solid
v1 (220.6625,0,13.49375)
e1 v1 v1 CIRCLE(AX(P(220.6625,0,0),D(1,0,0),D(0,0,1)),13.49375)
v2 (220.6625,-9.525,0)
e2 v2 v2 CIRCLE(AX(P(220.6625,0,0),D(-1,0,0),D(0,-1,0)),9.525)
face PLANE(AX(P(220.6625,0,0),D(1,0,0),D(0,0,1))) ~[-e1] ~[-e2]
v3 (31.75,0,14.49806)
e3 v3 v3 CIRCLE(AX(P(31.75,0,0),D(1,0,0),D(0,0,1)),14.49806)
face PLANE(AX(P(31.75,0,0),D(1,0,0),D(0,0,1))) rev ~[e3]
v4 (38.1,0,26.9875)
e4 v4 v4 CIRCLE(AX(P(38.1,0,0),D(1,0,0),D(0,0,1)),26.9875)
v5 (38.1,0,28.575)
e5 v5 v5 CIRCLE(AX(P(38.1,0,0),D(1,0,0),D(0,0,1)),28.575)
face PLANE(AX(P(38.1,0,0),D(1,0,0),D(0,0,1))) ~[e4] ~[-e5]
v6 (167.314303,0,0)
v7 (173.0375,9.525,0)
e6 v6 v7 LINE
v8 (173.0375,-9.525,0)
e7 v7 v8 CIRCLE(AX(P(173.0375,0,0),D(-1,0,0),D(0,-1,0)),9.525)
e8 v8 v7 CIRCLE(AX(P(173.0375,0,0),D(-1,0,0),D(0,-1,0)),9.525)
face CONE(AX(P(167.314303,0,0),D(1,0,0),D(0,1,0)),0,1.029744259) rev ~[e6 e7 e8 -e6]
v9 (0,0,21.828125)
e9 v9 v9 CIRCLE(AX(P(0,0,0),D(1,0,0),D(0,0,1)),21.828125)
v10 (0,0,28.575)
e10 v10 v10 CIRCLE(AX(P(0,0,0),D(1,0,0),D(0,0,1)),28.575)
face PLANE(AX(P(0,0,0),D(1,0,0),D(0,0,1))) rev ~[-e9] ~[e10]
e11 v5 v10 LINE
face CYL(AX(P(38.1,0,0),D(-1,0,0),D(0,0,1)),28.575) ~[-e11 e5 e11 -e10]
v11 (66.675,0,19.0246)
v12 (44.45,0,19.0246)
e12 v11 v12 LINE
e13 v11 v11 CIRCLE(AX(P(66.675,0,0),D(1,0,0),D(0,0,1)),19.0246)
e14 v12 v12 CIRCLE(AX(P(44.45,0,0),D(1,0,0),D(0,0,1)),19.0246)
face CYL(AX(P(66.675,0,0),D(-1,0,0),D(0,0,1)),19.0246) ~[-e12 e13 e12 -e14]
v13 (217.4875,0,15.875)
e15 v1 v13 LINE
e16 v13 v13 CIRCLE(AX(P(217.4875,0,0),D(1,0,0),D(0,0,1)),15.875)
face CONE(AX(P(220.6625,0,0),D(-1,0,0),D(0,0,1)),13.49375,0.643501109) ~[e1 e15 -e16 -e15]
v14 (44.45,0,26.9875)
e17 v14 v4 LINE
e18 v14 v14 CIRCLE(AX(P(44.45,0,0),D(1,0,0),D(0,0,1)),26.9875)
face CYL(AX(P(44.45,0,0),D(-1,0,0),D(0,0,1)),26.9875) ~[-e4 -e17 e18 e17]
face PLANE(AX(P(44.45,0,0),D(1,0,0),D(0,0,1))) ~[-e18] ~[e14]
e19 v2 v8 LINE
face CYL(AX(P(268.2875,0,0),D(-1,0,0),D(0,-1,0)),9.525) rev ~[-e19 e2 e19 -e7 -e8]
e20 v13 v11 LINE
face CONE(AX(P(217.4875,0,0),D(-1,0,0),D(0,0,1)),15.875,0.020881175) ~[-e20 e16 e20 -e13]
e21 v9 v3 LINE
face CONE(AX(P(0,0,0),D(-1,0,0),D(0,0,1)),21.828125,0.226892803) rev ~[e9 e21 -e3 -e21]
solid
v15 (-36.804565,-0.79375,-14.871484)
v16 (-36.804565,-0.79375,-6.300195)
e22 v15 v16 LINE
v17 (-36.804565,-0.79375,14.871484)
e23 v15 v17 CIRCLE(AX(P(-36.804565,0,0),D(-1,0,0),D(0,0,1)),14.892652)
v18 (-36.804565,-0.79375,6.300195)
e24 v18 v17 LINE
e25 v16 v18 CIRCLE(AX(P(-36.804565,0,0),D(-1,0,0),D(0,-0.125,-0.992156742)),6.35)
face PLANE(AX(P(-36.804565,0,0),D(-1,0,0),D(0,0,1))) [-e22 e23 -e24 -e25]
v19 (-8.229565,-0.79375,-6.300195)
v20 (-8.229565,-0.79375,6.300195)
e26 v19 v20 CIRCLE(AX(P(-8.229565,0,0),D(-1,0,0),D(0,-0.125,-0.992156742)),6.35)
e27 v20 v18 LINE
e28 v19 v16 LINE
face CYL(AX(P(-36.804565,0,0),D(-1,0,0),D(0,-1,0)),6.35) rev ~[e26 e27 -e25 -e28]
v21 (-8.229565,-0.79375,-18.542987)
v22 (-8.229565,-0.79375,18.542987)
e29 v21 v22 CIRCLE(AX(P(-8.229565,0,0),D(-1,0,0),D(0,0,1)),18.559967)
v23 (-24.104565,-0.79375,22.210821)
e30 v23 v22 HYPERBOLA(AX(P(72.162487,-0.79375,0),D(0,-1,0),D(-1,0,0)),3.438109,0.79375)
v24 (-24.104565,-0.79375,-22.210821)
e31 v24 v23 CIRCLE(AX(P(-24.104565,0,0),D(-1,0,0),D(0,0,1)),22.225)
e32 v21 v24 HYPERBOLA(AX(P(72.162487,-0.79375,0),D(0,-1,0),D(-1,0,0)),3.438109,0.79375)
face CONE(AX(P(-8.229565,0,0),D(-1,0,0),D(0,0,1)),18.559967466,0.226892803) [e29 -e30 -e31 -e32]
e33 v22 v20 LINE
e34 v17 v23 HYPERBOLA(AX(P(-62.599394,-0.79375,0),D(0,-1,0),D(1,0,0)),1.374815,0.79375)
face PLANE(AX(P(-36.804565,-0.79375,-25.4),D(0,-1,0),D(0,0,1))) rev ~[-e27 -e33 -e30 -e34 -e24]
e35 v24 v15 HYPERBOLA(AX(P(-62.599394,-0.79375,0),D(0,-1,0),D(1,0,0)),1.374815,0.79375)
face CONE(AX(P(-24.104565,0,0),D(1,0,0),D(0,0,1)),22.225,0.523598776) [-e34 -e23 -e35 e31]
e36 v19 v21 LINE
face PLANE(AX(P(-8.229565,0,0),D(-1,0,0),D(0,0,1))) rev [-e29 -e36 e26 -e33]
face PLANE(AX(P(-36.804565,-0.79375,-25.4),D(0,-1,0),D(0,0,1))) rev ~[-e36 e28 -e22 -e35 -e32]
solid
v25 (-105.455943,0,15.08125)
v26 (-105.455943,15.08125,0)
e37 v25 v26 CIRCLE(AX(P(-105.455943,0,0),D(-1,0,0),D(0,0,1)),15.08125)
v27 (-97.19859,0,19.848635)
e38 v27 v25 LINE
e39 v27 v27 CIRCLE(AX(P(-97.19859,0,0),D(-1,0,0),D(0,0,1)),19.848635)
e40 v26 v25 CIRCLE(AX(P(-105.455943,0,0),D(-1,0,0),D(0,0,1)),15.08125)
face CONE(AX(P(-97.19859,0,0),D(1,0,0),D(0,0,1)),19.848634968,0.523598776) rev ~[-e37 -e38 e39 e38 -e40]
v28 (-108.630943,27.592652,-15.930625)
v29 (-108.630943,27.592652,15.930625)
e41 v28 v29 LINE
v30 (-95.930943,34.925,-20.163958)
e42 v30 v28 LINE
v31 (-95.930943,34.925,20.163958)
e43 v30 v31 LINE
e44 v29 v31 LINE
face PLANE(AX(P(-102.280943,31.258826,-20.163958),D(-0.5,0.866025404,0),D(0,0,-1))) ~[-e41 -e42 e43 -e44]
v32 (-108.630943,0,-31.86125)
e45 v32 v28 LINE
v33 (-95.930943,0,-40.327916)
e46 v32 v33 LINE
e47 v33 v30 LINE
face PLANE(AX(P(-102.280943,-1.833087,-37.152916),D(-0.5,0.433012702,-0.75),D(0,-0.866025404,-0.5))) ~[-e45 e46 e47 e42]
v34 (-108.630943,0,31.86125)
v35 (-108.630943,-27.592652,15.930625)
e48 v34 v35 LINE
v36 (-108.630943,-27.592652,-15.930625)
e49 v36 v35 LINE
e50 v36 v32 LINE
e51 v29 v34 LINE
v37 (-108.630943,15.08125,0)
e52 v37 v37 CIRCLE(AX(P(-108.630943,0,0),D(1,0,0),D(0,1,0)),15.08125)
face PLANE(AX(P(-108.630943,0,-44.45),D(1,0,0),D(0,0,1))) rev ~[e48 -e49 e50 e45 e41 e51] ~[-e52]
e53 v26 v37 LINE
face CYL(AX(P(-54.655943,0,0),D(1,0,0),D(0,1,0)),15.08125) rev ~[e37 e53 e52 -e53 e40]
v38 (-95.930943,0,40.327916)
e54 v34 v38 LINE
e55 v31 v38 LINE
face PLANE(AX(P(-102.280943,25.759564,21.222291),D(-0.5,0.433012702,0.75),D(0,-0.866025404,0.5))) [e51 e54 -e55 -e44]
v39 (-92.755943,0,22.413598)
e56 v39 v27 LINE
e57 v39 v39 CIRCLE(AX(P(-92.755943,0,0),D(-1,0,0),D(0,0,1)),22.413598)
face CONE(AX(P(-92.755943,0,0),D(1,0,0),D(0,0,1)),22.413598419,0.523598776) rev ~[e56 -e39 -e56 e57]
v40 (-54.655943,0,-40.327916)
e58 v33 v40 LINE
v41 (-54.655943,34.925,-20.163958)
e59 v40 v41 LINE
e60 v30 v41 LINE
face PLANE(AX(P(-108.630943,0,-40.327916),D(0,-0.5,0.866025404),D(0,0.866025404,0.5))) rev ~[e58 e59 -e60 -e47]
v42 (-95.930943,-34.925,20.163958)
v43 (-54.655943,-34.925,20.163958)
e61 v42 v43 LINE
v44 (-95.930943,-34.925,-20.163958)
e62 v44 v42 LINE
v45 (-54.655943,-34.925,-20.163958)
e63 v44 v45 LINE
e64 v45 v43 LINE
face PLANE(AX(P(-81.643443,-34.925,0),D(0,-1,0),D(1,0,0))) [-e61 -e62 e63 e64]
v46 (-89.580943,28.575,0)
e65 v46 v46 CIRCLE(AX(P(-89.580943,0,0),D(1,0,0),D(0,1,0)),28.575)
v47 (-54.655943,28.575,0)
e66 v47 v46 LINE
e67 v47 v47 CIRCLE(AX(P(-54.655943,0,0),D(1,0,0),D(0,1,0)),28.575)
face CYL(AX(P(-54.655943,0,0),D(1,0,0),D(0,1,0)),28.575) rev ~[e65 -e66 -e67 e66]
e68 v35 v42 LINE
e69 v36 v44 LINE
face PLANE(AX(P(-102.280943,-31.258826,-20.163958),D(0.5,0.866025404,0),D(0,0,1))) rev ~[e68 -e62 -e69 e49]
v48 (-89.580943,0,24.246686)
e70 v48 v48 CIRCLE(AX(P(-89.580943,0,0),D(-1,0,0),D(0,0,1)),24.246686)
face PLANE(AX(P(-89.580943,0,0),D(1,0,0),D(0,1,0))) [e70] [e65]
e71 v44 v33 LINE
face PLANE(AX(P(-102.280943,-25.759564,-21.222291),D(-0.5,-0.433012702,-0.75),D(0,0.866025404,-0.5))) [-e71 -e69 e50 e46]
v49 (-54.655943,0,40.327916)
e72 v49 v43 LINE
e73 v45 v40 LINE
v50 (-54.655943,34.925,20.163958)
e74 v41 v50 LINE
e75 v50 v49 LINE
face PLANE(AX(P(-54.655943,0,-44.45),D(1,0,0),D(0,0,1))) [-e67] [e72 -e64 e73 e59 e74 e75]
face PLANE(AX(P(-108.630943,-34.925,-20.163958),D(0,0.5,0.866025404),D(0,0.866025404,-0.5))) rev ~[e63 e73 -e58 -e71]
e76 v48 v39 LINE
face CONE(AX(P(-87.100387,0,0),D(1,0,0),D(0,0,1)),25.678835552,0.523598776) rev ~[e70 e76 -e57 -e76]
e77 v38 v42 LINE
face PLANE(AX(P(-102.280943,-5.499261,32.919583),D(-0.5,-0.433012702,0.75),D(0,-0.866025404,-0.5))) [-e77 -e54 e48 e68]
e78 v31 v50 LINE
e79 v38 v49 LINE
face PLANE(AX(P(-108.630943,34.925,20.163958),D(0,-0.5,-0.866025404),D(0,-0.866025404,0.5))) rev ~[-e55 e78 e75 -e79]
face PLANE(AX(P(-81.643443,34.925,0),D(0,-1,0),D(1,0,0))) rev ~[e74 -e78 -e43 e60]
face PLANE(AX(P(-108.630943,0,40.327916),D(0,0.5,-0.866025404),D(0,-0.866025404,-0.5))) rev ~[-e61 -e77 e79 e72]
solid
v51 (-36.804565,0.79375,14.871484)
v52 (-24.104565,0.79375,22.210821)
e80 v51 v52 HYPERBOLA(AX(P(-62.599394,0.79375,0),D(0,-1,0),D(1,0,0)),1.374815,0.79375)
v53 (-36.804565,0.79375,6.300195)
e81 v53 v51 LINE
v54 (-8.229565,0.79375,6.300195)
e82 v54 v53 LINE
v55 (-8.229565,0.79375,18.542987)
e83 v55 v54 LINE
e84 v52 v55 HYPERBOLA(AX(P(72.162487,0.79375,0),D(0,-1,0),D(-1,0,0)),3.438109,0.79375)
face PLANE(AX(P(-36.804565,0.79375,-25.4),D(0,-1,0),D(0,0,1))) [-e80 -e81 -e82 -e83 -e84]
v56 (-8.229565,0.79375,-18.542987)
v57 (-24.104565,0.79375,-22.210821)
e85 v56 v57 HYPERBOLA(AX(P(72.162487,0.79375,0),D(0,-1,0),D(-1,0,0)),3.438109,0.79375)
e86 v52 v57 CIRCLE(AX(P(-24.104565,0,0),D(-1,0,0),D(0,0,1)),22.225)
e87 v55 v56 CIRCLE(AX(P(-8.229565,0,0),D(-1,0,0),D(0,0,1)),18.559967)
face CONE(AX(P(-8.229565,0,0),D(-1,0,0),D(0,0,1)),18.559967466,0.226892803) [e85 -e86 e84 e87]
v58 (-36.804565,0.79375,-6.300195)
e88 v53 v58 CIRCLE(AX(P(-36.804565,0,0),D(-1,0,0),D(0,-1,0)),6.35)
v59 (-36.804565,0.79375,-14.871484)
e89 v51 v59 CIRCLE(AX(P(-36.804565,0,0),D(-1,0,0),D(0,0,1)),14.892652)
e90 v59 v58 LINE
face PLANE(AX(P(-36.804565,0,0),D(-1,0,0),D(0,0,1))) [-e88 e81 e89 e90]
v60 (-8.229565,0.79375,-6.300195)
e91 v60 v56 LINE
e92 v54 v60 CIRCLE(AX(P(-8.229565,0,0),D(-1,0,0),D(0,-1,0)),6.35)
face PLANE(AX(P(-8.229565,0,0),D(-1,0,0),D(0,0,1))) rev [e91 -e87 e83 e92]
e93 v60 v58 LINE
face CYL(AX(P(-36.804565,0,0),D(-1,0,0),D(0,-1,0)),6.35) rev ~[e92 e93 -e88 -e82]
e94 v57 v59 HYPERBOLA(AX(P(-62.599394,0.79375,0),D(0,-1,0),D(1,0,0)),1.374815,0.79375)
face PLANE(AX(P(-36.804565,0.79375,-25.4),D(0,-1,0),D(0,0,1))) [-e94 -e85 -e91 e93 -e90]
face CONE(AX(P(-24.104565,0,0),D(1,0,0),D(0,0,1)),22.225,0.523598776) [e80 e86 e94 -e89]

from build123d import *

# Parameters (mm, degrees)
F3_D         = 19.05
F3_DEPTH     = 47.625
F3_TIP       = 5.7231973962
F6_R         = 6.35
F7_DEPTH     = 44.45
F8_W         = 1.5875
F8_H         = 50.8
F9_DEPTH     = 50.8
F10_W        = 53.975
F10_H        = 88.9
F11_DEPTH    = 34.925
F13_DEPTH    = 53.975
F14_C1_SIZE2 = 7.3323484187
F14_C1_SIZE  = 12.7
F14_C2_SIZE2 = 7.3323484187
F14_C2_SIZE  = 12.7
F14_C3_SIZE2 = 12.7
F14_C3_SIZE  = 7.3323484187
F14_C4_SIZE2 = 12.7
F14_C4_SIZE  = 7.3323484187
F14_C5_SIZE2 = 12.7
F14_C5_SIZE  = 7.3323484187
F14_C6_SIZE2 = 12.7
F14_C6_SIZE  = 7.3323484187
F15_R        = 15.08125
F16_DEPTH    = 53.976
F17_R        = 28.575
F18_DEPTH    = 34.925


with BuildPart() as f1:
    # F0 (on Front) → F1 (revolve)
    with BuildSketch(Plane.XZ):
        Polygon((38.1, 26.9875), (38.1, 0), (44.45, 0), (44.45, 19.0246), (44.45, 26.9875), align=None)
        Polygon((31.75, 14.4980599318), (31.75, 0), (38.1, 0), (38.1, 26.9875), (38.1, 28.575), (0, 28.575), (0, 21.828125), align=None)
        Polygon((44.45, 19.0246), (44.45, 0), (217.4875, 0), (220.6625, 0), (220.6625, 13.49375), (217.4875, 15.875), (66.675, 19.0246), align=None)
    revolve(axis=Axis((130.96875, 0, 0), (1, 0, 0)))

    # F3
    with Locations(Plane.YZ.offset(220.6625)):
        with Locations((0, 0)):
            Hole(F3_D / 2, depth=F3_DEPTH)
            with Locations((0, 0, -(F3_DEPTH + F3_TIP / 2))):  # 118° drill point
                Cone(0, F3_D / 2, F3_TIP, mode=Mode.SUBTRACT)


with BuildPart() as f5:
    # F4 (on Front) → F5 (revolve)
    with BuildSketch(Plane.XZ):
        Polygon((-24.1045645936, 0), (-8.2295645936, 0), (-8.2295645936, 7.1290070594), (-8.2295645936, 18.5599674659), (-24.1045645936, 22.225), (-36.8045645936, 14.8926515813), (-36.8045645936, 0), align=None)
    revolve(axis=Axis((-30.4545645936, 0, 0), (-1, 0, 0)))

    # F6 (on face) → F7 (cut)
    with BuildSketch(Plane(origin=(-36.8045645936, 0, 0), x_dir=(0, -1, 0), z_dir=(-1, 0, 0))):
        Circle(F6_R)
    extrude(amount=-F7_DEPTH, mode=Mode.SUBTRACT)

    # F8 (on face) → F9 (cut)
    with BuildSketch(Plane(origin=(-36.8045645936, 0, 0), x_dir=(0, -1, 0), z_dir=(-1, 0, 0))):
        Rectangle(F8_W, F8_H)
    extrude(amount=-F9_DEPTH, mode=Mode.SUBTRACT)


with BuildPart() as f11:
    # F10 (on Front) → F11 (new body, symmetric)
    with BuildSketch(Plane.XZ):
        with Locations((-81.6434432337, 0)):
            Rectangle(F10_W, F10_H)
    extrude(amount=F11_DEPTH, both=True)

    # F12 (on face) → F13 (cut)
    with BuildSketch(Plane(origin=(-108.6309432337, 0, 0), x_dir=(0, -1, 0), z_dir=(-1, 0, 0))):
        Polygon((0, 40.3279163029), (34.925, 20.1639581514), (34.925, 44.45), (-34.925, 44.45), (-34.925, 20.1639581514), align=None)
        Polygon((34.925, -44.45), (34.925, -20.1639581514), (0, -40.3279163029), (-34.925, -20.1639581514), (-34.925, -44.45), align=None)
    extrude(amount=-F13_DEPTH, mode=Mode.SUBTRACT)

    # F14: chamfer of 12.7 x 7.3323484187 on 6 edges, made by hand

    # F14_c1
    f14_c1_edges = [f11.edges().sort_by_distance(p)[0] for p in [
        (-108.6309432337, 34.925, 0),
    ]]
    f14_c1_side = f11.faces().sort_by_distance((-108.4842962653, 34.925, 0))[0]
    chamfer(f14_c1_edges, length=F14_C1_SIZE, length2=F14_C1_SIZE2, reference=f14_c1_side)

    # F14_c2
    f14_c2_edges = [f11.edges().sort_by_distance(p)[0] for p in [
        (-108.6309432337, 13.7963257906, -32.3626038938),
    ]]
    f14_c2_side = f11.faces().sort_by_distance((-108.4842962653, 13.7963257906, -32.3626038938))[0]
    chamfer(f14_c2_edges, length=F14_C2_SIZE, length2=F14_C2_SIZE2, reference=f14_c2_side)

    # F14_c3
    f14_c3_edges = [f11.edges().sort_by_distance(p)[0] for p in [
        (-108.6309432337, 13.7963257906, 32.3626038938),
    ]]
    f14_c3_side = f11.faces().sort_by_distance((-108.6309432337, 13.7230023065, 32.2356038938))[0]
    chamfer(f14_c3_edges, length=F14_C3_SIZE, length2=F14_C3_SIZE2, reference=f14_c3_side)

    # F14_c4
    f14_c4_edges = [f11.edges().sort_by_distance(p)[0] for p in [
        (-108.6309432337, -21.1286742094, 28.1292705605),
    ]]
    f14_c4_side = f11.faces().sort_by_distance((-108.6309432337, -21.0553507252, 28.0022705605))[0]
    chamfer(f14_c4_edges, length=F14_C4_SIZE, length2=F14_C4_SIZE2, reference=f14_c4_side)

    # F14_c5
    f14_c5_edges = [f11.edges().sort_by_distance(p)[0] for p in [
        (-108.6309432337, -34.925, -4.2333333333),
    ]]
    f14_c5_side = f11.faces().sort_by_distance((-108.6309432337, -34.7783530316, -4.2333333333))[0]
    chamfer(f14_c5_edges, length=F14_C5_SIZE, length2=F14_C5_SIZE2, reference=f14_c5_side)

    # F14_c6
    f14_c6_edges = [f11.edges().sort_by_distance(p)[0] for p in [
        (-108.6309432337, -17.4625, -30.2459372272),
    ]]
    f14_c6_side = f11.faces().sort_by_distance((-108.6309432337, -17.3891765158, -30.1189372272))[0]
    chamfer(f14_c6_edges, length=F14_C6_SIZE, length2=F14_C6_SIZE2, reference=f14_c6_side)

    # F15 (on face) → F16 (cut, through all)
    with BuildSketch(Plane.YZ.offset(-54.6559432337)):
        Circle(F15_R)
    extrude(amount=-F16_DEPTH, mode=Mode.SUBTRACT)

    # F17 (on face) → F18 (cut)
    with BuildSketch(Plane.YZ.offset(-54.6559432337)):
        Circle(F17_R)
    extrude(amount=-F18_DEPTH, mode=Mode.SUBTRACT)

    # F19 (on Front) → F20 (revolve, cut)
    with BuildSketch(Plane.XZ):
        Polygon((-92.7559432337, 15.08125), (-105.4559432337, 15.08125), (-105.4559432337, 0), (-92.7559432337, 0), (-87.1003866196, 0), (-87.1003866196, 15.08125), align=None)
        Polygon((-97.1985902505, 19.8486349676), (-105.4559432337, 15.08125), (-92.7559432337, 15.08125), (-92.7559432337, 22.4135984187), align=None)
        Polygon((-92.7559432337, 22.4135984187), (-92.7559432337, 15.08125), (-87.1003866196, 15.08125), (-87.1003866196, 22.4286857992), (-87.1003866196, 25.6788355523), align=None)
    revolve(axis=Axis((-96.2781649266, 0, 0), (-1, 0, 0)), mode=Mode.SUBTRACT)


solid = Compound([f1.part, f5.part, f11.part])
